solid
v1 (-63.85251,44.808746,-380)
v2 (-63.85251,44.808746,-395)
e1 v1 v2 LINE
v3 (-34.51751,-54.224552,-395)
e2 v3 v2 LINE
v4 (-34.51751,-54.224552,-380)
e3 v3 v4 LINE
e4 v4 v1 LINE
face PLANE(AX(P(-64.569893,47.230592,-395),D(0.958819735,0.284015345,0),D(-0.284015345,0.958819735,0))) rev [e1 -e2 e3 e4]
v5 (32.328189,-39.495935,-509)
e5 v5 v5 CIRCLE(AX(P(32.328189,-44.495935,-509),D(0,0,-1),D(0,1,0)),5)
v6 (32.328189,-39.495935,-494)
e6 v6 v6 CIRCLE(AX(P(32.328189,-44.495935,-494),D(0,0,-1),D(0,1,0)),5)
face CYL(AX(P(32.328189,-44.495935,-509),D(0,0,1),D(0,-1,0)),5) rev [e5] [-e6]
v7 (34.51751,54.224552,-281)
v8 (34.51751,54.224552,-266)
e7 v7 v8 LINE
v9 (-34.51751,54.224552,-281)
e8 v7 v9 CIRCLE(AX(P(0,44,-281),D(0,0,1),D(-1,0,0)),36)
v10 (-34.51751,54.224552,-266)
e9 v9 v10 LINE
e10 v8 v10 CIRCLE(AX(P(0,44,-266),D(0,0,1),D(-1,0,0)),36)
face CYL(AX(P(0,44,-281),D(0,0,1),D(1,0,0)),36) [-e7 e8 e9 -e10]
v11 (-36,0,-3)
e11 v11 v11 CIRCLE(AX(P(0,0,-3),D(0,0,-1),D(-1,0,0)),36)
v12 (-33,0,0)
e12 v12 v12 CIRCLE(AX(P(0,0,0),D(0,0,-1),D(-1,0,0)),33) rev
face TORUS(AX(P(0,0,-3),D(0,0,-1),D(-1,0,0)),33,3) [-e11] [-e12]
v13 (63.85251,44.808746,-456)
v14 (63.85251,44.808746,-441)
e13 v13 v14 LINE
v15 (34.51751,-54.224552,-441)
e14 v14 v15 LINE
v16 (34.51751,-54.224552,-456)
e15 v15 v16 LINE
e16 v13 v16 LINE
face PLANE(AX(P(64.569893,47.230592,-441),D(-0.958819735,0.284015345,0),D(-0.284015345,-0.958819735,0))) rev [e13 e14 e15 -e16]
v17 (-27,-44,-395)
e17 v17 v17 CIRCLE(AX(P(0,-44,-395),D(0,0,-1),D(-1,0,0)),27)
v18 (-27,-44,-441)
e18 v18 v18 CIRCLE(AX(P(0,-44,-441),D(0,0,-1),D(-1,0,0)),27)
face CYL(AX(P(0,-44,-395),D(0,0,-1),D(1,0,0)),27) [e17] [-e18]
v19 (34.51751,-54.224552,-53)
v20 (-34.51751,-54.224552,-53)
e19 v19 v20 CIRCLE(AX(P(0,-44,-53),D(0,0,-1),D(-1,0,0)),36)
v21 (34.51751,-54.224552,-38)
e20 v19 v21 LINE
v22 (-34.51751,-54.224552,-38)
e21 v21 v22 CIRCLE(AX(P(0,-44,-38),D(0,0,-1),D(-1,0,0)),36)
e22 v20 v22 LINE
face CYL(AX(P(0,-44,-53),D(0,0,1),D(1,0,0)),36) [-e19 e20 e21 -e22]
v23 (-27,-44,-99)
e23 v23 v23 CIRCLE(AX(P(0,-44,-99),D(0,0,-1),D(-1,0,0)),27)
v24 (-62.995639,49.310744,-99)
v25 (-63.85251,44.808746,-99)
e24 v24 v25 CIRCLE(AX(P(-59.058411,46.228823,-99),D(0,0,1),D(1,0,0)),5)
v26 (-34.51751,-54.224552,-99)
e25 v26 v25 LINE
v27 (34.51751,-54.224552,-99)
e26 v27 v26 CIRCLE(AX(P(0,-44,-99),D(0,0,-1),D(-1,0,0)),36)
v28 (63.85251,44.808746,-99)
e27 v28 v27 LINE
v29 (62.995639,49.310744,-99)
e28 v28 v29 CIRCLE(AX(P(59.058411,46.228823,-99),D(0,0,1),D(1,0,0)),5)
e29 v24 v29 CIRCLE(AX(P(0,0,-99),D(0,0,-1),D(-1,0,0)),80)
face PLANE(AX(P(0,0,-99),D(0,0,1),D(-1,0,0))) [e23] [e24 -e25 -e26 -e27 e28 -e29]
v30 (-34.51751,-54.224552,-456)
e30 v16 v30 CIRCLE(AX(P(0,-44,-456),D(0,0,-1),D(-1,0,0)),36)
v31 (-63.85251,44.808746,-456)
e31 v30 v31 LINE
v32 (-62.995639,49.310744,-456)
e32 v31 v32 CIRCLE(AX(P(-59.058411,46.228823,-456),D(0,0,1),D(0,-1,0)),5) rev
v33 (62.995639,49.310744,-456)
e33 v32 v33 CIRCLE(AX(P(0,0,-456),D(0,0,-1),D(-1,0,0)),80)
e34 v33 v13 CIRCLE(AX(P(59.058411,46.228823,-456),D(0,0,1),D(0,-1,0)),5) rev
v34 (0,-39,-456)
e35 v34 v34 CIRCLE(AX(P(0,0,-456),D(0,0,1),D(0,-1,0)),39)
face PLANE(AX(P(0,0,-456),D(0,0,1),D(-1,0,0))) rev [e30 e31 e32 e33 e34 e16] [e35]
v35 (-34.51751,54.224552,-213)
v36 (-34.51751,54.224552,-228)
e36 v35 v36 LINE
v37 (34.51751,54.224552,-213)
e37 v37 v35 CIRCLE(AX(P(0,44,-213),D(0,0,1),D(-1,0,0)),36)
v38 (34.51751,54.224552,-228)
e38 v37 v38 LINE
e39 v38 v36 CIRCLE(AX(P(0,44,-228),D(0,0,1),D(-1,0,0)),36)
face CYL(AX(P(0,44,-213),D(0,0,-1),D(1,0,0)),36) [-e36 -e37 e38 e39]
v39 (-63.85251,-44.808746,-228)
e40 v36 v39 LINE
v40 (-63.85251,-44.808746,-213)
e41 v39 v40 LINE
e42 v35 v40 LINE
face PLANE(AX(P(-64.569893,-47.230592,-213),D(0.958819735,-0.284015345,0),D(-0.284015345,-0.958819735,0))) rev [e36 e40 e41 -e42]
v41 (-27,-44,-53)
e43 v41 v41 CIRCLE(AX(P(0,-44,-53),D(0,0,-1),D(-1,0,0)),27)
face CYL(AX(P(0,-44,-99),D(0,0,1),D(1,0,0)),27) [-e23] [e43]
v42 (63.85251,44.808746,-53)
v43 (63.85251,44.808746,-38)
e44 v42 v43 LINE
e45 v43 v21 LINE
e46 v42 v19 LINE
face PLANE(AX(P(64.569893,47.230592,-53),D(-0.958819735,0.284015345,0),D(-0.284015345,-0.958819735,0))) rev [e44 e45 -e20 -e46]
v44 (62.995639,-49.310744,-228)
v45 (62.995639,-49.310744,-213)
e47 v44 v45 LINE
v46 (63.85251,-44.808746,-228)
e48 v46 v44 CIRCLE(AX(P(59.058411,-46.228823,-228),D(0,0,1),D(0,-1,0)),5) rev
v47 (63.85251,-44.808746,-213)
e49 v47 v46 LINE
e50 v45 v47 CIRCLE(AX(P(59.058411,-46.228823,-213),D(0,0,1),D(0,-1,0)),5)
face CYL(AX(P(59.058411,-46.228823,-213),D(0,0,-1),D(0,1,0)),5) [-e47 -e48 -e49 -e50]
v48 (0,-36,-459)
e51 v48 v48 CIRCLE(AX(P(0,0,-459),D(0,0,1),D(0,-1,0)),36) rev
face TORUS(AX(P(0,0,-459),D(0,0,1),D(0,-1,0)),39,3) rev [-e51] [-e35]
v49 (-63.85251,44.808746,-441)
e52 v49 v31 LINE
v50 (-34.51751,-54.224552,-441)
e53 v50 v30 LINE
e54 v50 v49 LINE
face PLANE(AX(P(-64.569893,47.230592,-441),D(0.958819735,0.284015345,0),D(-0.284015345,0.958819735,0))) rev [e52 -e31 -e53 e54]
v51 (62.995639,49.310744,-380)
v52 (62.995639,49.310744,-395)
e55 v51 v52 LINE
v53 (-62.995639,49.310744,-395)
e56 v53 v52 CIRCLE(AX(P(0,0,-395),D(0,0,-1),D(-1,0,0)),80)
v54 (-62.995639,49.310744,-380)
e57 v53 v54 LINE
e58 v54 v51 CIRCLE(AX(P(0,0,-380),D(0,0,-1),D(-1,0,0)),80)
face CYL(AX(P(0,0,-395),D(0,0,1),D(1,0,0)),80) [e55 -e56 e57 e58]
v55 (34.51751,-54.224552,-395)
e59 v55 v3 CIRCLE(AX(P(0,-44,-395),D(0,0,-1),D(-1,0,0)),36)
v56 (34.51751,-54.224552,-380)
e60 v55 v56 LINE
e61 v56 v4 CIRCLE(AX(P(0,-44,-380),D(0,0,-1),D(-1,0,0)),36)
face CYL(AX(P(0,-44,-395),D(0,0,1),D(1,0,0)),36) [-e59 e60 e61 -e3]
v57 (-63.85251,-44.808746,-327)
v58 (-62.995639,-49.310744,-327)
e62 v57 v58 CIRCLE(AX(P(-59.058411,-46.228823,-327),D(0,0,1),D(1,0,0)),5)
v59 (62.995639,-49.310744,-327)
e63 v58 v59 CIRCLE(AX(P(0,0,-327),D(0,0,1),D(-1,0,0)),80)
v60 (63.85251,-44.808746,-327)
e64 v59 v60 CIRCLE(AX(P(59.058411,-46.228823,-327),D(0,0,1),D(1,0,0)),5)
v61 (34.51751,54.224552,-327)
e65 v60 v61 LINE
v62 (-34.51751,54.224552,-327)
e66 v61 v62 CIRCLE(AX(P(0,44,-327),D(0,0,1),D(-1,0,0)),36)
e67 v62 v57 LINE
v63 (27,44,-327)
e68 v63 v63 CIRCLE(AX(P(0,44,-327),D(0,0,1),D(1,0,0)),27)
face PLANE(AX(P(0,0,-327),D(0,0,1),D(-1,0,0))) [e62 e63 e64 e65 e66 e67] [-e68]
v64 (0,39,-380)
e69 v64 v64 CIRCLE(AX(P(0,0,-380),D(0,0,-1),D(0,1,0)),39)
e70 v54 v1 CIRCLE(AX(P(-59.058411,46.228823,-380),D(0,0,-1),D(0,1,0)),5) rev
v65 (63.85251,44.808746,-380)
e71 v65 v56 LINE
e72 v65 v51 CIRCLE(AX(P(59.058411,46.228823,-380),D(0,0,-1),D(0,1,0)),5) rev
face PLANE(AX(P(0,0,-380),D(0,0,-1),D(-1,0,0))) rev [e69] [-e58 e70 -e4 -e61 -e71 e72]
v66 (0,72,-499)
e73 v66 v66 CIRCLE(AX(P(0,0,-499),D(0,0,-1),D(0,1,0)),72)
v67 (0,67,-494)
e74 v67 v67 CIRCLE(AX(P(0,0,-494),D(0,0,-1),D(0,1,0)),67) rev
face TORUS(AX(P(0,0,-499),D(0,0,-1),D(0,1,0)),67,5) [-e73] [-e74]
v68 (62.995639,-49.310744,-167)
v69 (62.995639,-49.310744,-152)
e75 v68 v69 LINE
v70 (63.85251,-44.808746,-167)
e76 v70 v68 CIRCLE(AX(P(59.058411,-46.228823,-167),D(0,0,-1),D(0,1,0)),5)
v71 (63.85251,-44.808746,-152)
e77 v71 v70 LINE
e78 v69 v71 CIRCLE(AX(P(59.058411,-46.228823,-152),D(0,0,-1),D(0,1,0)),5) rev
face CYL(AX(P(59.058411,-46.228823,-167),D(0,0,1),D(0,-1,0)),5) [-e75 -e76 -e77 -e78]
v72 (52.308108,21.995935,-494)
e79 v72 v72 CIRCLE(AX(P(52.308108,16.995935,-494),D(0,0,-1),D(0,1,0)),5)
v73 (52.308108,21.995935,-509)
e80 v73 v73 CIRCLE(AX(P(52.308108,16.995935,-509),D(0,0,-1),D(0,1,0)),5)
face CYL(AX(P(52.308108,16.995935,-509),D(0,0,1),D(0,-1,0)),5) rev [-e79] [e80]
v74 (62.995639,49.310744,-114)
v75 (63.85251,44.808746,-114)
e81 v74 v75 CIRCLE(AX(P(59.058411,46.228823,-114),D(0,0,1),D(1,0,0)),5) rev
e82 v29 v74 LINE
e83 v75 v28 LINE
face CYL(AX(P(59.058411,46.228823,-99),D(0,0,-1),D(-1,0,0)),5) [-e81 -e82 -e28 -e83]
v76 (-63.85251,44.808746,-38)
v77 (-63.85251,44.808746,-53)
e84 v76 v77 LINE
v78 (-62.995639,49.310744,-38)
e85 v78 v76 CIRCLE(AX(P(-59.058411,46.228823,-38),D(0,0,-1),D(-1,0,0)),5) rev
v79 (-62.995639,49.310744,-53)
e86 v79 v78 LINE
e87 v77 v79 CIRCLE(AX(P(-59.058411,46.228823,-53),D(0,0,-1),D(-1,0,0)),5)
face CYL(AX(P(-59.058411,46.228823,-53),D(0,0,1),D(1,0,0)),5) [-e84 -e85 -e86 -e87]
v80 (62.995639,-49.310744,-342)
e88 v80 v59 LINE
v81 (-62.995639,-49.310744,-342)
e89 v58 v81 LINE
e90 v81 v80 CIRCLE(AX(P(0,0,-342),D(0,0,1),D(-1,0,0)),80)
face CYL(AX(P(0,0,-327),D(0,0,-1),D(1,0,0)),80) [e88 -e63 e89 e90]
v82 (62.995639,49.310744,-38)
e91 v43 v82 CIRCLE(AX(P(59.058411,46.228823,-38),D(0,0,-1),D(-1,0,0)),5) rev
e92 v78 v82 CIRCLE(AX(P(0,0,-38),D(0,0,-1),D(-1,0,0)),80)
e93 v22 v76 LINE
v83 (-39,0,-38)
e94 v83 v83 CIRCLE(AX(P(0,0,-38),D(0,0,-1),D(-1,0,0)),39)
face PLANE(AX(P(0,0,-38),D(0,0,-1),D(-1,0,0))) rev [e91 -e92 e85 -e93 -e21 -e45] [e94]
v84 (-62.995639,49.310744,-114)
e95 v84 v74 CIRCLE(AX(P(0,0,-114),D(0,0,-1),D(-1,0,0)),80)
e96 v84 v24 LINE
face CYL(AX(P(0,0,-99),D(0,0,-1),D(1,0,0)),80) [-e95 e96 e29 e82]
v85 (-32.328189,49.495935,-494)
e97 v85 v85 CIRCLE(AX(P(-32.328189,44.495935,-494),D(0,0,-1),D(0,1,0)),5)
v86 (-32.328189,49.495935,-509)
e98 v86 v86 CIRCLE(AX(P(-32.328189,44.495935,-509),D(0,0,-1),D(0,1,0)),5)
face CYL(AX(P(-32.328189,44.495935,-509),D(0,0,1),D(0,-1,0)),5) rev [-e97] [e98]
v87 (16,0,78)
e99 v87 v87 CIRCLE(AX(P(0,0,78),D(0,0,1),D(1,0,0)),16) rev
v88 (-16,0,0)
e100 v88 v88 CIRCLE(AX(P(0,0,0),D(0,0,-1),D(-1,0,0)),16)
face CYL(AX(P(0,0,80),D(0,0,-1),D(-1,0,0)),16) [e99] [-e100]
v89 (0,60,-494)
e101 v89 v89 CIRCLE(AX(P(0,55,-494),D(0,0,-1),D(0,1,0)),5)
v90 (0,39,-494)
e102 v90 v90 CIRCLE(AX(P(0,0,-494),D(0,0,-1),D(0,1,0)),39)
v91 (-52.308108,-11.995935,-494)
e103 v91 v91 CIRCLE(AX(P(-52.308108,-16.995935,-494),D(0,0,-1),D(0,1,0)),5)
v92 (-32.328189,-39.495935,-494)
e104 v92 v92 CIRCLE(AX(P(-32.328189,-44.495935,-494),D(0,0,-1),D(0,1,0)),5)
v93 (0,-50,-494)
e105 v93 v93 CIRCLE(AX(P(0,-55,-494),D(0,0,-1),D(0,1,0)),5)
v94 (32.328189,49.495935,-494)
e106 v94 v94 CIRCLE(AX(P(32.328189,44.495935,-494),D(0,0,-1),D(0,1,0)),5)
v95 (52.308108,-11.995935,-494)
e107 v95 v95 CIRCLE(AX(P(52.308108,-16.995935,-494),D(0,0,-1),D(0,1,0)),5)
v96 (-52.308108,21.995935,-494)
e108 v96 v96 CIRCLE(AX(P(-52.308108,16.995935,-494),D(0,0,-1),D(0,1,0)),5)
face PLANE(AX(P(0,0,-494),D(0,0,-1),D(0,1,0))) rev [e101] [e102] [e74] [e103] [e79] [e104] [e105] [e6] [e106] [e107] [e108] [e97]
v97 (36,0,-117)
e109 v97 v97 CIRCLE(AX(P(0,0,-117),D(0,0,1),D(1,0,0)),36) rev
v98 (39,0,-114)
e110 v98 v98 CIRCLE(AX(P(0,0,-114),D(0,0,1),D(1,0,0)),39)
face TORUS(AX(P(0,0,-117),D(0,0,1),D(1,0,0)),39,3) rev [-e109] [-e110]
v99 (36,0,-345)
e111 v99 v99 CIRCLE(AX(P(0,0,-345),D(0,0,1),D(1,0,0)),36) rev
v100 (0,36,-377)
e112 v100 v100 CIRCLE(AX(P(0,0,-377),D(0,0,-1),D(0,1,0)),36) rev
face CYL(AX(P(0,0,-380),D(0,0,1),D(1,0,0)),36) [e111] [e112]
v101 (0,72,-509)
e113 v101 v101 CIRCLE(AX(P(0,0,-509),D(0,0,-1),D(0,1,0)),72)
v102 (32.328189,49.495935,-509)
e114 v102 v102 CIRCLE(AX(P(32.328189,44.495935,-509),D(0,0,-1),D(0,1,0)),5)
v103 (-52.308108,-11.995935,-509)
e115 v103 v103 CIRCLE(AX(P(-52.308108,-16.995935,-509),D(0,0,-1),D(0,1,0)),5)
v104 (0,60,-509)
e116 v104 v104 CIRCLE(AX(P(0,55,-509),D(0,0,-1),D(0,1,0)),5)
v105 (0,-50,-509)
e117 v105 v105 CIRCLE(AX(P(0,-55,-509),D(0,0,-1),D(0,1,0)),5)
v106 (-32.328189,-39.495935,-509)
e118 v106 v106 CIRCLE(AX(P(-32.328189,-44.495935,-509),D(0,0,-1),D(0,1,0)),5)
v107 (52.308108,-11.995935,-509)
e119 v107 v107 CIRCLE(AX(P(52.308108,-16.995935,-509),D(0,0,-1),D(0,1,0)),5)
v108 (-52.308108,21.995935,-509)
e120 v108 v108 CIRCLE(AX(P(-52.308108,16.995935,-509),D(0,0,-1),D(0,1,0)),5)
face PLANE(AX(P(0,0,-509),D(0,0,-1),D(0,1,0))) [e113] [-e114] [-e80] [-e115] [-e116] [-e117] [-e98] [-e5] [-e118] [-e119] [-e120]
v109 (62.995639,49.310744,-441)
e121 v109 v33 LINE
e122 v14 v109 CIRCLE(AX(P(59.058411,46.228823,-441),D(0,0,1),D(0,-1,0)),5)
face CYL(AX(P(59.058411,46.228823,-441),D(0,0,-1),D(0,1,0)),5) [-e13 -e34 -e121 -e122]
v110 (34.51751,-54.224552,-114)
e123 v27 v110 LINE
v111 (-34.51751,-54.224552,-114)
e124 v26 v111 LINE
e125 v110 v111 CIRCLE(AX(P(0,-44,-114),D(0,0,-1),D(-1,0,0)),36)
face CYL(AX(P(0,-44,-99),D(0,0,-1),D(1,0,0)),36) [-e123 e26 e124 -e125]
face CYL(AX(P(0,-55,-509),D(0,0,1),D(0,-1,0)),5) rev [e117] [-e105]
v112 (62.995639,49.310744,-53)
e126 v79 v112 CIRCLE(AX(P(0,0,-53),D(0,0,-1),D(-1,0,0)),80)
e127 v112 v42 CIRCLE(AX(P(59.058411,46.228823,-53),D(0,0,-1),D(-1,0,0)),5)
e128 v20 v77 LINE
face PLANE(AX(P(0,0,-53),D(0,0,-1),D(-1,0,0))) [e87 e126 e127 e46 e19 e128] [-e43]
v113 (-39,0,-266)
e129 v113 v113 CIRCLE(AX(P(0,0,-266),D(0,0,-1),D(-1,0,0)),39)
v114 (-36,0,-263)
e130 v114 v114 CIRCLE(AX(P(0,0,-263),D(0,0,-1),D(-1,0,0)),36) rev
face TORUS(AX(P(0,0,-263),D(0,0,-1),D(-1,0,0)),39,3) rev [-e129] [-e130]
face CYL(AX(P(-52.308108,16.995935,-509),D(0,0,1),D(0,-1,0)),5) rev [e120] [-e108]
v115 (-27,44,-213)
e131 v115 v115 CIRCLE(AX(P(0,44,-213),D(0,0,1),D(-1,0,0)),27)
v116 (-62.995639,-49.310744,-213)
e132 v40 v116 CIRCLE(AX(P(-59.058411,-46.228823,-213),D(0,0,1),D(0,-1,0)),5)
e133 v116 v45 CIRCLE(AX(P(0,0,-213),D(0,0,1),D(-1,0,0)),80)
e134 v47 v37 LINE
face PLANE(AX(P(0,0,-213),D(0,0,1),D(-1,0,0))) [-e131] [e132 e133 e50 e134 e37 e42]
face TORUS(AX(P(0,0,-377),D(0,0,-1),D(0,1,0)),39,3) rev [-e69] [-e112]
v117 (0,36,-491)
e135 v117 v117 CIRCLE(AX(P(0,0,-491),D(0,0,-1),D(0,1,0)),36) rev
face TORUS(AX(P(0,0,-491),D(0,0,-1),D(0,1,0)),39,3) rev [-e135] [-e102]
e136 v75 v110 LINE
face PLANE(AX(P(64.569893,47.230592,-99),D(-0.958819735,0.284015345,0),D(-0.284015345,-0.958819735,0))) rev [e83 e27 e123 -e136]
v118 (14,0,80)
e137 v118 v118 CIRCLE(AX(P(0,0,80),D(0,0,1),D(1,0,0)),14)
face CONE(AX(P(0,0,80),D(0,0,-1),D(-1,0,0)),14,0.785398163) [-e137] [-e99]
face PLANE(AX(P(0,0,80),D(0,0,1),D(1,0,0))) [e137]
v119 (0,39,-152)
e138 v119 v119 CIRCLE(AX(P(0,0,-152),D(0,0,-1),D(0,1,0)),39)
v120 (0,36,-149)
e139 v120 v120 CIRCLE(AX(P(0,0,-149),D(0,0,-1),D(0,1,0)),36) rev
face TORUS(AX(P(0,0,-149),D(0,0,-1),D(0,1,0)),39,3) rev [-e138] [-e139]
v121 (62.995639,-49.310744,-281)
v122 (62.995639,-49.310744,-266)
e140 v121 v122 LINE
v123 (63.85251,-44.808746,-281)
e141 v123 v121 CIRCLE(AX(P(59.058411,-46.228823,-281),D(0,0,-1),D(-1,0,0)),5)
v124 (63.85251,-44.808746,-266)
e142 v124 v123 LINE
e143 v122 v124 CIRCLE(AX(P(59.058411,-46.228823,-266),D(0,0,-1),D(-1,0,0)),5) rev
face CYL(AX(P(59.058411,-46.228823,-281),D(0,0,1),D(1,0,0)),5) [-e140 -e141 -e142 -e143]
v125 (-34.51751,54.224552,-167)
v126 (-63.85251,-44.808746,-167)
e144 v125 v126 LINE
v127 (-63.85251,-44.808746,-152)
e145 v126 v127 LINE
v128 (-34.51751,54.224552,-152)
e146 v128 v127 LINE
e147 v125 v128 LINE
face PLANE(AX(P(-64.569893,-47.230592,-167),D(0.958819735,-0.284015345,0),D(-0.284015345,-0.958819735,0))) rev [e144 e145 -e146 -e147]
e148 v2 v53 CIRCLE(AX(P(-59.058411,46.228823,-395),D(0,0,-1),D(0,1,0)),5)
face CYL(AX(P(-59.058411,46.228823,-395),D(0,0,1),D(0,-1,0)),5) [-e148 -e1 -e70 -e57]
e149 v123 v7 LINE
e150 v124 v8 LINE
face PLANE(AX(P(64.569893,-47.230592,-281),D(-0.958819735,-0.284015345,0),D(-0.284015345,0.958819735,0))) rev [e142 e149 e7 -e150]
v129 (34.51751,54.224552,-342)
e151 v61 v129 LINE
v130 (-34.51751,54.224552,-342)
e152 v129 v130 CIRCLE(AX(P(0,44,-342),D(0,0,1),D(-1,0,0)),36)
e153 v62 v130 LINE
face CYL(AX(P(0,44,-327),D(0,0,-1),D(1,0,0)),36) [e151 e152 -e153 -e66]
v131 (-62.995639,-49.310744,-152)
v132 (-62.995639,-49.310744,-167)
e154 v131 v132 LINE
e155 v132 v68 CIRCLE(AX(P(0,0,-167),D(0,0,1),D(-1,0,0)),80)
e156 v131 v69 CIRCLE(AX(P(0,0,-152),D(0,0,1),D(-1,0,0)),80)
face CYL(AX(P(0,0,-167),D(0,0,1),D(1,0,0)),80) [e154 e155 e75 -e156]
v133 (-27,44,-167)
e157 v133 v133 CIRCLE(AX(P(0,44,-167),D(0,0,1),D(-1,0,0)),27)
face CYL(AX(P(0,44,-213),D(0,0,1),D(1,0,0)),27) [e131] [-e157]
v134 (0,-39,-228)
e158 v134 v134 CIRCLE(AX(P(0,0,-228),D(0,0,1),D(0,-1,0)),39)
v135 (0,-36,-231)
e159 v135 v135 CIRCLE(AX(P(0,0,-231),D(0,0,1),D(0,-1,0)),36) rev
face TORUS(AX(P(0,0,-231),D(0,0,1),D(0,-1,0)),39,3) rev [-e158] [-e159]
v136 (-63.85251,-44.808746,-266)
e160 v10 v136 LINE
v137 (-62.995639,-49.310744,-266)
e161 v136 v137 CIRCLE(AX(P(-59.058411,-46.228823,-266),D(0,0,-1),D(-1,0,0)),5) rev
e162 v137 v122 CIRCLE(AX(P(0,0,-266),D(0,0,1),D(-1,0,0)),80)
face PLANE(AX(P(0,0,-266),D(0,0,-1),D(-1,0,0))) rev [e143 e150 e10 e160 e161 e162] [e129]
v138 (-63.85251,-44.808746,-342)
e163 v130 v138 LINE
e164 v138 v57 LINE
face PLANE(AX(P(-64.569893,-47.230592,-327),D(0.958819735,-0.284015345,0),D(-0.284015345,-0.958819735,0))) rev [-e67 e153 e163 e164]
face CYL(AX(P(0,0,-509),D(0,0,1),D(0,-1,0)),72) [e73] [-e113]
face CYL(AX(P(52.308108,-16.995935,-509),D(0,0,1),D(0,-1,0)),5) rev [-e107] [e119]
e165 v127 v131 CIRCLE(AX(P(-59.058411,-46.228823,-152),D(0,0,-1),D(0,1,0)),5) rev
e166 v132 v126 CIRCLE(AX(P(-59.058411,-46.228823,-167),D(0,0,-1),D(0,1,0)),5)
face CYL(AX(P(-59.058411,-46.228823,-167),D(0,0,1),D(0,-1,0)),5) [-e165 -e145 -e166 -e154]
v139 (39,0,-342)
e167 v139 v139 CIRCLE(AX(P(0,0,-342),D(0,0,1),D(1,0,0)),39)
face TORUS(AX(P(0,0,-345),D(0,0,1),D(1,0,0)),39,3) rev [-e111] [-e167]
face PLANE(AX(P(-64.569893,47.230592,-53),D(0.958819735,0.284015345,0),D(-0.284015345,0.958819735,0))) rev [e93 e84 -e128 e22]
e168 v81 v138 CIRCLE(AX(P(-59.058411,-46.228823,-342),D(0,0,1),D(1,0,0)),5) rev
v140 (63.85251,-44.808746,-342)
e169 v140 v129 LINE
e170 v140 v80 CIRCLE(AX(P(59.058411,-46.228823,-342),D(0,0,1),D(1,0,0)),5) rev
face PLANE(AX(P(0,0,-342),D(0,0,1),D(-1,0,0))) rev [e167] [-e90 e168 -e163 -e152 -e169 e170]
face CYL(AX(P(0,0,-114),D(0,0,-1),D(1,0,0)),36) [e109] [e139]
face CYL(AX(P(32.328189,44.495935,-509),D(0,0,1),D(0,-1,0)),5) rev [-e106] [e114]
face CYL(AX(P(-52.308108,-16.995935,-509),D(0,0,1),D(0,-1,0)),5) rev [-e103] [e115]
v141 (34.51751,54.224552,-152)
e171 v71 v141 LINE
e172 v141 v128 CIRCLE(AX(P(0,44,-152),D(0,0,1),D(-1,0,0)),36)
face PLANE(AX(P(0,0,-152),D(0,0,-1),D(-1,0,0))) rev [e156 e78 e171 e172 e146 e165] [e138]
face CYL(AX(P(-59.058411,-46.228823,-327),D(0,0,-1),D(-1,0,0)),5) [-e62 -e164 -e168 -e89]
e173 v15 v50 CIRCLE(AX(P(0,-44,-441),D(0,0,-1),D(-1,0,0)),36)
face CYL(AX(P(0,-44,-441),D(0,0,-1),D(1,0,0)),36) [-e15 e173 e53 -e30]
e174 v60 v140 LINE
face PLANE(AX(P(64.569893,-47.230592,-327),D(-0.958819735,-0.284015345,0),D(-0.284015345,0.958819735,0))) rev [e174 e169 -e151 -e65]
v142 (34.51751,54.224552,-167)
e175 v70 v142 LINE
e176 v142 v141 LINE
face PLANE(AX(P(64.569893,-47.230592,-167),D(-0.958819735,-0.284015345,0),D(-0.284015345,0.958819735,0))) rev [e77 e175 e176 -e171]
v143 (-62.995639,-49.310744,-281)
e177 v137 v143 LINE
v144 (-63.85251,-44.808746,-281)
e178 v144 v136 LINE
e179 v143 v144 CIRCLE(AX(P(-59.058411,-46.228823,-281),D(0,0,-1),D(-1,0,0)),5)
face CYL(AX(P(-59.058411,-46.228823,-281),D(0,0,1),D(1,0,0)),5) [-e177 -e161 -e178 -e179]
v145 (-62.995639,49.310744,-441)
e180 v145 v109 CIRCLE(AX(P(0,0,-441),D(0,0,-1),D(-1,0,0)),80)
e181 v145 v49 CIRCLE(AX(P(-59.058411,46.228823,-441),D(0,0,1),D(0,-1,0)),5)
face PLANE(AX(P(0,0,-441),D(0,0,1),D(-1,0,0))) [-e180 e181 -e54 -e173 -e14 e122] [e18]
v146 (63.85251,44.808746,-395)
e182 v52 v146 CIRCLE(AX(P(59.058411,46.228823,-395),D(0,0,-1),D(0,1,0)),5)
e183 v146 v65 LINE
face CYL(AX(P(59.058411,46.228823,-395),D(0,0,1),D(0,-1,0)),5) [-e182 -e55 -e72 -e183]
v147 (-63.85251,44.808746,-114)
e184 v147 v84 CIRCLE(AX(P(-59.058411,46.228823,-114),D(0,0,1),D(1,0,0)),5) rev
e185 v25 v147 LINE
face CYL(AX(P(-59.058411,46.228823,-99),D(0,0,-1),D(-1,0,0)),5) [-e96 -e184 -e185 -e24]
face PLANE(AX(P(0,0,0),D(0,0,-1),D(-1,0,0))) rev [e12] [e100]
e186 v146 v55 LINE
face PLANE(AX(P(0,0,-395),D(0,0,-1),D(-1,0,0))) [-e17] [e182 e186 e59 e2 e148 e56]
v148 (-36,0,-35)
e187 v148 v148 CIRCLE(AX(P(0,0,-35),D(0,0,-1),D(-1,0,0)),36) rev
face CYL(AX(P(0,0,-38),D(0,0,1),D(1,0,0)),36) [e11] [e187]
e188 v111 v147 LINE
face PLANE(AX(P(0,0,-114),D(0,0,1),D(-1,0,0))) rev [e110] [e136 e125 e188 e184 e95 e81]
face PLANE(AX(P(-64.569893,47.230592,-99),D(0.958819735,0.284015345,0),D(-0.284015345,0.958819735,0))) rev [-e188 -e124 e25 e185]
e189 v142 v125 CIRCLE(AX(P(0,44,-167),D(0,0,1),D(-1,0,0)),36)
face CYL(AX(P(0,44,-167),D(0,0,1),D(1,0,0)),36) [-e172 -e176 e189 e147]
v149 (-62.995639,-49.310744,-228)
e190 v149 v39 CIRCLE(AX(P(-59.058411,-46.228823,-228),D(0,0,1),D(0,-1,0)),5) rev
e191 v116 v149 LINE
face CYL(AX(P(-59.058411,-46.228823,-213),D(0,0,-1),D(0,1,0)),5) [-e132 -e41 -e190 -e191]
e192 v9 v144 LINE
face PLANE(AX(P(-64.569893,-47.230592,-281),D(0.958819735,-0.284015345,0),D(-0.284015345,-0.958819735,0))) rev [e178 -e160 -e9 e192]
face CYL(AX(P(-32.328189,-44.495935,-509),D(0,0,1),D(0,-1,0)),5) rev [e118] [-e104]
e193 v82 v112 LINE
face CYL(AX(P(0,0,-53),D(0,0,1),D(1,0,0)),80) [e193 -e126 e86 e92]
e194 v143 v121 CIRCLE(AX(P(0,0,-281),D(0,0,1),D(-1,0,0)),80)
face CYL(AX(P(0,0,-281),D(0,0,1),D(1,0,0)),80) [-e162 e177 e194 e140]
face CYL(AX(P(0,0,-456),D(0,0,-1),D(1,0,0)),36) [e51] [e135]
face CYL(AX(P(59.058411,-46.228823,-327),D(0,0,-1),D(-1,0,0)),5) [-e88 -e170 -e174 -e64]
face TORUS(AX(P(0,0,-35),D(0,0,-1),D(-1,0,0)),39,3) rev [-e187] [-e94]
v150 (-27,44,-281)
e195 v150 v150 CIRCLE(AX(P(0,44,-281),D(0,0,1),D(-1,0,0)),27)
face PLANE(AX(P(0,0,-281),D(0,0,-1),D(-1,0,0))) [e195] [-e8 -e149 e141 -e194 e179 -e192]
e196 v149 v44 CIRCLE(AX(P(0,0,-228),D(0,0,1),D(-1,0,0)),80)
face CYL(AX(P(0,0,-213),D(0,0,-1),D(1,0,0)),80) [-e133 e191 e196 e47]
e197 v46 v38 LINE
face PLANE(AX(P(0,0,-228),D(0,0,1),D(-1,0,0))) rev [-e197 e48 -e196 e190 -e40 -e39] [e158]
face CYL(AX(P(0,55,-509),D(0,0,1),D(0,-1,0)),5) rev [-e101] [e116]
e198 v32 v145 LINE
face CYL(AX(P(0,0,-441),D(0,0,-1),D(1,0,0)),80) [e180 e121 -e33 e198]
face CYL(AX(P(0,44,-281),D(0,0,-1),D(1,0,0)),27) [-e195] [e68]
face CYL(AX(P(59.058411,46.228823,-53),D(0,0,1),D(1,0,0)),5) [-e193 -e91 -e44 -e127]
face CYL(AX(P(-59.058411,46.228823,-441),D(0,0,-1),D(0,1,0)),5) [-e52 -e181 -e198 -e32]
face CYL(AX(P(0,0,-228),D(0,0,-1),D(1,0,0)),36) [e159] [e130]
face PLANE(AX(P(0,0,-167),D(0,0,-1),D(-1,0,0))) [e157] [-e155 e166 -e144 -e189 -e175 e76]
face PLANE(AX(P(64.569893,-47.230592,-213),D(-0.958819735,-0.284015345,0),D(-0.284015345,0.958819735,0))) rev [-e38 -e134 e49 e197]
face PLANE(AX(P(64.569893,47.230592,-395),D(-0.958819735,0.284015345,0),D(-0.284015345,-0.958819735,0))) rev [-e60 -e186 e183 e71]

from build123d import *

# Parameters (mm, degrees)
SKETCH1_R             = 16
BOSS_EXTRUDE1_DEPTH   = 80
SKETCH2_R             = 36
BOSS_EXTRUDE2_DEPTH   = 38
BOSS_EXTRUDE3_DEPTH   = 15
SKETCH5_R             = 27
BOSS_EXTRUDE4_DEPTH   = 46
MIRROR4_START         = -266
MIRROR4_OUTLINE_R     = 36
MIRROR4_DEPTH         = 38
MIRROR4_START_2       = -228
MIRROR4_2_DEPTH       = 15
MIRROR4_START_3       = -213
MIRROR4_3_OUTLINE_R   = 27
MIRROR4_3_DEPTH       = 46
MIRROR4_START_4       = -167
MIRROR4_4_DEPTH       = 15
BODY_MOVE_COPY1_ANGLE = 180
SKETCH7_R             = 72
SKETCH7_R_2           = 5
BOSS_EXTRUDE5_DEPTH   = 15
FILLET1_R             = 3
CHAMFER1_SIZE         = 2
FILLET2_R             = 5
FILLET3_R             = 5


# Read off the part's stored shape, not the designer's step: Mirror4
with BuildPart() as part:
    # Sketch1 → Boss-Extrude1 (new body)
    with BuildSketch(Plane.XY):
        Circle(SKETCH1_R)
    extrude(amount=BOSS_EXTRUDE1_DEPTH)


with BuildPart() as body_2:
    # Sketch2 → Boss-Extrude2 (new body)
    with BuildSketch(Plane(origin=(0, 0, 0), x_dir=(-1, 0, 0), z_dir=(0, 0, -1))):
        Circle(SKETCH2_R)
    extrude(amount=BOSS_EXTRUDE2_DEPTH)


with BuildPart() as body_3:
    # Sketch4 → Boss-Extrude3 (new body)
    with BuildSketch(Plane(origin=(0, 0, -38), x_dir=(-1, 0, 0), z_dir=(0, 0, -1))):
        with BuildLine():
            Line((-64.569893475, 47.23059238), (-34.517510455, -54.224552409))
            ThreePointArc((-34.517510455, -54.224552409), (0, -80), (34.517510455, -54.224552409))
            Line((34.517510455, -54.224552409), (64.569893475, 47.23059238))
            ThreePointArc((64.569893475, 47.23059238), (0, 80), (-64.569893475, 47.23059238))
        make_face()
    extrude(amount=BOSS_EXTRUDE3_DEPTH)


with BuildPart() as body_4:
    # Sketch5 → Boss-Extrude4 (new body)
    with BuildSketch(Plane(origin=(0, 0, -53), x_dir=(-1, 0, 0), z_dir=(0, 0, -1))):
        with Locations((0, -44)):
            Circle(SKETCH5_R)
    extrude(amount=BOSS_EXTRUDE4_DEPTH)


with BuildPart() as body_5:
    # Mirror3: mirrored copy
    add(body_2.part.mirror(Plane(origin=(0, 0, -76), x_dir=(1, 0, 0), z_dir=(0, 0, -1))))


with BuildPart() as body_6:
    # Mirror3 2: mirrored copy
    add(body_3.part.mirror(Plane(origin=(0, 0, -76), x_dir=(1, 0, 0), z_dir=(0, 0, -1))))


with BuildPart() as body_7:
    # Mirror4 outline → Mirror4 (new body)
    with BuildSketch(Plane.XY.offset(MIRROR4_START)):
        Circle(MIRROR4_OUTLINE_R)
    extrude(amount=MIRROR4_DEPTH)


with BuildPart() as body_8:
    # Mirror4 2 outline → Mirror4 2 (new body)
    with BuildSketch(Plane.XY.offset(MIRROR4_START_2)):
        with BuildLine():
            ThreePointArc((64.569893475, 47.23059238), (0, 80), (-64.569893475, 47.23059238))
            Line((-64.569893475, 47.23059238), (-34.517510455, -54.224552409))
            ThreePointArc((-34.517510455, -54.224552409), (0, -80), (34.517510455, -54.224552409))
            Line((34.517510455, -54.224552409), (64.569893475, 47.23059238))
        make_face()
    extrude(amount=MIRROR4_2_DEPTH)


with BuildPart() as body_9:
    # Mirror4 3 outline → Mirror4 3 (new body)
    with BuildSketch(Plane.XY.offset(MIRROR4_START_3)):
        with Locations((0, -44)):
            Circle(MIRROR4_3_OUTLINE_R)
    extrude(amount=MIRROR4_3_DEPTH)


with BuildPart() as body_10:
    # Mirror4 4 outline → Mirror4 4 (new body)
    with BuildSketch(Plane.XY.offset(MIRROR4_START_4)):
        with BuildLine():
            Line((34.517510455, -54.224552409), (64.569893475, 47.23059238))
            ThreePointArc((64.569893475, 47.23059238), (0, 80), (-64.569893475, 47.23059238))
            Line((-64.569893475, 47.23059238), (-34.517510455, -54.224552409))
            ThreePointArc((-34.517510455, -54.224552409), (0, -80), (34.517510455, -54.224552409))
        make_face()
    extrude(amount=MIRROR4_4_DEPTH)


with BuildPart() as body_10_1:
    # Body-Move/Copy1: moved
    add(body_10.part.rotate(Axis((0, 0, -190), (1, 0, 0)), BODY_MOVE_COPY1_ANGLE))


with BuildPart() as body_9_1:
    # Body-Move/Copy1: moved
    add(body_9.part.rotate(Axis((0, 0, -190), (1, 0, 0)), BODY_MOVE_COPY1_ANGLE))


with BuildPart() as body_8_1:
    # Body-Move/Copy1: moved
    add(body_8.part.rotate(Axis((0, 0, -190), (1, 0, 0)), BODY_MOVE_COPY1_ANGLE))


with BuildPart() as body_11:
    # Mirror5: mirrored copy
    add(body_2.part.mirror(Plane(origin=(0, 0, -247), x_dir=(1, 0, 0), z_dir=(0, 0, -1))))

    # Sketch7 → Boss-Extrude5 (add)
    with BuildSketch(Plane(origin=(0, 0, -494), x_dir=(-1, 0, 0), z_dir=(0, 0, -1))):
        with Locations(Location((0, 0, 0), (0, 0, 90))):
            Circle(SKETCH7_R)
        with Locations(Location((0, 55, 0), (0, 0, 90))):
            Circle(SKETCH7_R_2, mode=Mode.SUBTRACT)
        with Locations(Location((32.328188876, 44.495934691, 0), (0, 0, 90))):
            Circle(SKETCH7_R_2, mode=Mode.SUBTRACT)
        with Locations(Location((52.308108396, 16.995934691, 0), (0, 0, 90))):
            Circle(SKETCH7_R_2, mode=Mode.SUBTRACT)
        with Locations(Location((52.308108396, -16.995934691, 0), (0, 0, 90))):
            Circle(SKETCH7_R_2, mode=Mode.SUBTRACT)
        with Locations(Location((32.328188876, -44.495934691, 0), (0, 0, 90))):
            Circle(SKETCH7_R_2, mode=Mode.SUBTRACT)
        with Locations(Location((0, -55, 0), (0, 0, 90))):
            Circle(SKETCH7_R_2, mode=Mode.SUBTRACT)
        with Locations(Location((-32.328188876, -44.495934691, 0), (0, 0, 90))):
            Circle(SKETCH7_R_2, mode=Mode.SUBTRACT)
        with Locations(Location((-52.308108396, -16.995934691, 0), (0, 0, 90))):
            Circle(SKETCH7_R_2, mode=Mode.SUBTRACT)
        with Locations(Location((-52.308108396, 16.995934691, 0), (0, 0, 90))):
            Circle(SKETCH7_R_2, mode=Mode.SUBTRACT)
        with Locations(Location((-32.328188876, 44.495934691, 0), (0, 0, 90))):
            Circle(SKETCH7_R_2, mode=Mode.SUBTRACT)
    extrude(amount=BOSS_EXTRUDE5_DEPTH)


with BuildPart() as body_12:
    # Mirror5 2: mirrored copy
    add(body_3.part.mirror(Plane(origin=(0, 0, -247), x_dir=(1, 0, 0), z_dir=(0, 0, -1))))


with BuildPart() as body_13:
    # Mirror5 3: mirrored copy
    add(body_6.part.mirror(Plane(origin=(0, 0, -247), x_dir=(1, 0, 0), z_dir=(0, 0, -1))))


with BuildPart() as body_14:
    # Mirror5 4: mirrored copy
    add(body_4.part.mirror(Plane(origin=(0, 0, -247), x_dir=(1, 0, 0), z_dir=(0, 0, -1))))


with BuildPart() as body_15:
    # Mirror5 5: mirrored copy
    add(body_5.part.mirror(Plane(origin=(0, 0, -247), x_dir=(1, 0, 0), z_dir=(0, 0, -1))))


with BuildPart() as body_16:
    # Mirror5 6: mirrored copy
    add(body_9_1.part.mirror(Plane(origin=(0, 0, -247), x_dir=(1, 0, 0), z_dir=(0, 0, -1))))


with BuildPart() as body_17:
    # Mirror5 7: mirrored copy
    add(body_8_1.part.mirror(Plane(origin=(0, 0, -247), x_dir=(1, 0, 0), z_dir=(0, 0, -1))))


with BuildPart() as body_18:
    # Mirror5 8: mirrored copy
    add(body_10_1.part.mirror(Plane(origin=(0, 0, -247), x_dir=(1, 0, 0), z_dir=(0, 0, -1))))


with BuildPart() as part_1:
    add(part.part)

    # Combine1: union body 2, body 3, body 6, body 4, body 8, body 5, body 10, body 9, body 7, body 18, body 16, body 15, body 17, body 13, body 12, body 11, body 14
    add(body_2.part)
    add(body_3.part)
    add(body_6.part)
    add(body_4.part)
    add(body_8_1.part)
    add(body_5.part)
    add(body_10_1.part)
    add(body_9_1.part)
    add(body_7.part)
    add(body_18.part)
    add(body_16.part)
    add(body_15.part)
    add(body_17.part)
    add(body_13.part)
    add(body_12.part)
    add(body_11.part)
    add(body_14.part)

    # Fillet1
    fillet1_edges = [part_1.edges().sort_by_distance(p)[0] for p in [
        (36, 0, -114),
        (36, 0, -152),
        (-36, 0, -228),
        (-36, 0, -266),
        (36, 0, -342),
        (36, 0, -380),
        (36, 0, -456),
        (36, 0, -494),
        (36, 0, 0),
        (36, 0, -38),
    ]]
    fillet(fillet1_edges, radius=FILLET1_R)

    # Chamfer1
    chamfer1_edges = [part_1.edges().sort_by_distance(p)[0] for p in [
        (-16, 0, 80),
    ]]
    chamfer(chamfer1_edges, length=CHAMFER1_SIZE)

    # Fillet2
    fillet2_edges = [part_1.edges().sort_by_distance(p)[0] for p in [
        (64.569893475, -47.23059238, -159.5),
        (-64.569893475, -47.23059238, -159.5),
        (-64.569893475, -47.23059238, -220.5),
        (64.569893475, -47.23059238, -220.5),
        (64.569893475, -47.23059238, -273.5),
        (-64.569893475, -47.23059238, -273.5),
        (-64.569893475, -47.23059238, -334.5),
        (64.569893475, -47.23059238, -334.5),
        (-64.569893475, 47.23059238, -387.5),
        (64.569893475, 47.23059238, -387.5),
        (64.569893475, 47.23059238, -448.5),
        (-64.569893475, 47.23059238, -448.5),
        (-64.569893475, 47.23059238, -45.5),
        (64.569893475, 47.23059238, -45.5),
        (64.569893475, 47.23059238, -106.5),
        (-64.569893475, 47.23059238, -106.5),
    ]]
    fillet(fillet2_edges, radius=FILLET2_R)

    # Fillet3
    fillet3_edges = [part_1.edges().sort_by_distance(p)[0] for p in [
        (0, -72, -494),
    ]]
    fillet(fillet3_edges, radius=FILLET3_R)


solid = part_1.part
